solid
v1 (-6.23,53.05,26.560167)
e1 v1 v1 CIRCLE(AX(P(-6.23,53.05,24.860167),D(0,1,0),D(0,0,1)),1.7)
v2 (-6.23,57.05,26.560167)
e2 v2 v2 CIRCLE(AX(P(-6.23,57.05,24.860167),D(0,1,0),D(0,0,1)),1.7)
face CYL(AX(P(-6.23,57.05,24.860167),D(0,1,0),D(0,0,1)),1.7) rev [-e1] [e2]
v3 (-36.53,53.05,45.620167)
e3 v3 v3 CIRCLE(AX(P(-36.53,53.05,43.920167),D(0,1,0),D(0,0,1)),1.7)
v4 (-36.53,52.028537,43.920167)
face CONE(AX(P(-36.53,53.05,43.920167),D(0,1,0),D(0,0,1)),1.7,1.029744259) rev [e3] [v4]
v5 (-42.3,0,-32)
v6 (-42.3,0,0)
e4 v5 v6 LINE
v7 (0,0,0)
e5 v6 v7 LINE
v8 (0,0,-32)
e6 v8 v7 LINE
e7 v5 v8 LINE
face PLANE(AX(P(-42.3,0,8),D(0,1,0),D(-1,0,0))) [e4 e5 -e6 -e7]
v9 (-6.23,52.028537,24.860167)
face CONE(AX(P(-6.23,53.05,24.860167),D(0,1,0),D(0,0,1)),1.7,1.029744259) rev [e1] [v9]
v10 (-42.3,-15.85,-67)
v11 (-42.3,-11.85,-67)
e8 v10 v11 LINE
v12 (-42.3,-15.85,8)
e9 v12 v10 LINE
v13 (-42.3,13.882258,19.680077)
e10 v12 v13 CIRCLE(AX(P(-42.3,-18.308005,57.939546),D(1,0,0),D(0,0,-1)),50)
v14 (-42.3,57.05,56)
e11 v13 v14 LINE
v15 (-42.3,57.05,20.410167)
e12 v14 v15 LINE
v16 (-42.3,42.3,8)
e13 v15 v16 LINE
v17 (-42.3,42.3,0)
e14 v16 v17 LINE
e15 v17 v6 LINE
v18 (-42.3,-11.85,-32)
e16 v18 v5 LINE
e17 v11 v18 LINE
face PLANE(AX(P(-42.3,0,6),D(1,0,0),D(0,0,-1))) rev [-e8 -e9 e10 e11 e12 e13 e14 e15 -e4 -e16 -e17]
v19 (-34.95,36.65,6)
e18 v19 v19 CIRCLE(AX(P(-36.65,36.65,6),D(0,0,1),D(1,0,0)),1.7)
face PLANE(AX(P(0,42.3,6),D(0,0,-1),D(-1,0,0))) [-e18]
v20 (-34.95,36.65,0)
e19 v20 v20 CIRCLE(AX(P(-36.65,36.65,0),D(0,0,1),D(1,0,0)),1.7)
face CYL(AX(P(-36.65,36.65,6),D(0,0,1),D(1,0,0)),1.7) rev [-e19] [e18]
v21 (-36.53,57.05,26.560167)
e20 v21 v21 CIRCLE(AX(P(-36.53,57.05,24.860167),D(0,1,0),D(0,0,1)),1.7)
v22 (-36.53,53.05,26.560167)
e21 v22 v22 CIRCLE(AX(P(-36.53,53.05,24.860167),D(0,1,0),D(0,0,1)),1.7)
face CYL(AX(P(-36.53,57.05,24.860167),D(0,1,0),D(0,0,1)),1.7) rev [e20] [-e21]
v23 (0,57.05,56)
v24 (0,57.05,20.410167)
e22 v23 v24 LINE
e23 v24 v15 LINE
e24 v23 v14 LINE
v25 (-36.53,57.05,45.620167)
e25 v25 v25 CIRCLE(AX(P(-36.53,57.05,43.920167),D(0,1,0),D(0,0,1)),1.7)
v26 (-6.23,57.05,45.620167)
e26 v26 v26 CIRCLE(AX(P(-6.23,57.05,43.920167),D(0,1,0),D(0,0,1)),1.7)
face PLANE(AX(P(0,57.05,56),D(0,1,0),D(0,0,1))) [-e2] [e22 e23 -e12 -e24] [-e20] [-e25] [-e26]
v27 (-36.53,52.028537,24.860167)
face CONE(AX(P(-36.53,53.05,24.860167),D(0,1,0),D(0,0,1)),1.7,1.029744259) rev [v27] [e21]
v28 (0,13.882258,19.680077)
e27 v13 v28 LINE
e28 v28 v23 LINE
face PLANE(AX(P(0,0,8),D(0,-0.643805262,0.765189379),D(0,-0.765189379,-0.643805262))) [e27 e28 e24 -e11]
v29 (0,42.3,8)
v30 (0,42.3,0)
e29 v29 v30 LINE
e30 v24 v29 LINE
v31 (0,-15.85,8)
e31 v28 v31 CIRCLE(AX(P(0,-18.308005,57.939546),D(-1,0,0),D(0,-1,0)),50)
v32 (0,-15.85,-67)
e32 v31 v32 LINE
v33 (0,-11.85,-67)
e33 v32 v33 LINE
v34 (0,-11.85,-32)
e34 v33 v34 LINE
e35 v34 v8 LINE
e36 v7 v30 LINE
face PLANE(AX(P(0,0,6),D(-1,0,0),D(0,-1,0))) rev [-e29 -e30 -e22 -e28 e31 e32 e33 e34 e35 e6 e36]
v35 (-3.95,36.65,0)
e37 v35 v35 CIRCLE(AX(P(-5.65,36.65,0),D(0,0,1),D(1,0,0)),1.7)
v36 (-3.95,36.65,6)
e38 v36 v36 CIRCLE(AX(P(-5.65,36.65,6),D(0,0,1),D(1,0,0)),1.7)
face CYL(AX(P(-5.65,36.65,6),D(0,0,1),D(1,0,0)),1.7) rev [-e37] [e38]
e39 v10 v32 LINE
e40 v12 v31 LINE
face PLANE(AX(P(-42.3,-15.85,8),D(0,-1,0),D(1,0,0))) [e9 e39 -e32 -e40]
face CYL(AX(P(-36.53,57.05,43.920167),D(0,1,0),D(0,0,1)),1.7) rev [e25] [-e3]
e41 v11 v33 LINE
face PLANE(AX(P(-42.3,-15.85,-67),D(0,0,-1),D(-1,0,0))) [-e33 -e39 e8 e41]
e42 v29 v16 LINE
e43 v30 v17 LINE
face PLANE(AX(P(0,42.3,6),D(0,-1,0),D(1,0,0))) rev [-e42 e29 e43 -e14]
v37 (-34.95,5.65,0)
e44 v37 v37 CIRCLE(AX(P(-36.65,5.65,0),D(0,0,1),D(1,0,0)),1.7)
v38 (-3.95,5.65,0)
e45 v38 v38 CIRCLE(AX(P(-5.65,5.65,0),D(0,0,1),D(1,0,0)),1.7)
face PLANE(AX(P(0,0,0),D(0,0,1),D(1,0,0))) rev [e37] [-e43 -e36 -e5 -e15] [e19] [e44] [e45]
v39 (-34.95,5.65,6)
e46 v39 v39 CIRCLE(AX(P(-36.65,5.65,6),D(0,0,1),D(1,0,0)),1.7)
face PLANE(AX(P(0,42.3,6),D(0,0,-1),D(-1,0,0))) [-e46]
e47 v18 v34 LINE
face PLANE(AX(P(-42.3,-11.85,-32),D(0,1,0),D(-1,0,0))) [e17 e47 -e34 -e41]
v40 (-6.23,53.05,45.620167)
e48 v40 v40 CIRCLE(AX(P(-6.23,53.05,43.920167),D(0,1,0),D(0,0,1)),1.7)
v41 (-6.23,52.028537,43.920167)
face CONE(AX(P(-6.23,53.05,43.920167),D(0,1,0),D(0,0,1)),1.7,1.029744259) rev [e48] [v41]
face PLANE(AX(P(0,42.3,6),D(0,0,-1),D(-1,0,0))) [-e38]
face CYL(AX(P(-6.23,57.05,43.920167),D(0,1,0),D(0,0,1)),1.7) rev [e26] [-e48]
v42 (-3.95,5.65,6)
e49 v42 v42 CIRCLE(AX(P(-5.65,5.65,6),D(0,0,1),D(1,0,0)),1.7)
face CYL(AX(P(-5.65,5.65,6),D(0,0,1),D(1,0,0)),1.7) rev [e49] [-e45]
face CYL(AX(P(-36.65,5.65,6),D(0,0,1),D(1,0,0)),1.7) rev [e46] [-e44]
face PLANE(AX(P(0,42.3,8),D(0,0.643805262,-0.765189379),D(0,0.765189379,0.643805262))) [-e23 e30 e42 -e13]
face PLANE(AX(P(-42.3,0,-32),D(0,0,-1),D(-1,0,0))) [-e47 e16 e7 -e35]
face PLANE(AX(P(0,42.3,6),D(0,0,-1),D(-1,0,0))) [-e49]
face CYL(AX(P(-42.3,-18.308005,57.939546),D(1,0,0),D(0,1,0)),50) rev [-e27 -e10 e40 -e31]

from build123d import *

# Parameters (mm, degrees)
SCHIZZO1_W                   = 42.3
SCHIZZO1_H                   = 42.3
ESTRUSIONE_ESTRUSIONE1_DEPTH = 6
FORO_PER_VITE_M3_1_OUTLINE_R = 1.7
FORO_PER_VITE_M3_1_DEPTH     = 6
ESTRUSIONE_ESTRUSIONE2_DEPTH = 42.3
ESTRUSIONE_ESTRUSIONE4_DEPTH = 42.3
RACCORDO1_R                  = 50


# Read off the part's stored shape, not the designer's step: Foro per Vite M3-1, Foro per Vite M3-2
with BuildPart() as part:
    # Schizzo1 → Estrusione-Estrusione1 (new body)
    with BuildSketch(Plane.XY):
        with Locations((-21.15, 21.15)):
            Rectangle(SCHIZZO1_W, SCHIZZO1_H)
    extrude(amount=ESTRUSIONE_ESTRUSIONE1_DEPTH)

    # Foro per Vite M3-1 outline → Foro per Vite M3-1 (cut)
    with BuildSketch(Plane.XY):
        with Locations((-5.65, 36.65)):
            Circle(FORO_PER_VITE_M3_1_OUTLINE_R)
        with Locations((-36.65, 5.65)):
            Circle(FORO_PER_VITE_M3_1_OUTLINE_R)
        with Locations((-5.65, 5.65)):
            Circle(FORO_PER_VITE_M3_1_OUTLINE_R)
        with Locations((-36.65, 36.65)):
            Circle(FORO_PER_VITE_M3_1_OUTLINE_R)
    extrude(amount=FORO_PER_VITE_M3_1_DEPTH, mode=Mode.SUBTRACT)

    # Schizzo4 → Estrusione-Estrusione2 (add)
    with BuildSketch(Plane.ZY.offset(42.3)):
        Polygon((6, 0), (8, 0), (56, 57.05), (20.410166521, 57.05), (8, 42.3), (6, 42.3), align=None)
    extrude(amount=-ESTRUSIONE_ESTRUSIONE2_DEPTH)

    # Foro per Vite M3-2 outline → Foro per Vite M3-2 (revolve, cut)
    with BuildSketch(Plane(origin=(-6.23, 0, 24.860166521), x_dir=(1, 0, 0), z_dir=(0, 0, 1))):
        Polygon((0, 57.05), (0, 52.028536948), (1.7, 53.05), (1.7, 57.05), align=None)
    revolve(axis=Axis((-6.23, 0, 24.860166521), (0, 1, 0)), mode=Mode.SUBTRACT)

    # Foro per Vite M3-2 2 outline → Foro per Vite M3-2 2 (revolve, cut)
    with BuildSketch(Plane(origin=(-36.53, 0, 43.920166521), x_dir=(1, 0, 0), z_dir=(0, 0, 1))):
        Polygon((0, 57.05), (0, 52.028536948), (1.7, 53.05), (1.7, 57.05), align=None)
    revolve(axis=Axis((-36.53, 0, 43.920166521), (0, 1, 0)), mode=Mode.SUBTRACT)

    # Foro per Vite M3-2 3 outline → Foro per Vite M3-2 3 (revolve, cut)
    with BuildSketch(Plane(origin=(-6.23, 0, 43.920166521), x_dir=(1, 0, 0), z_dir=(0, 0, 1))):
        Polygon((0, 57.05), (0, 52.028536948), (1.7, 53.05), (1.7, 57.05), align=None)
    revolve(axis=Axis((-6.23, 0, 43.920166521), (0, 1, 0)), mode=Mode.SUBTRACT)

    # Foro per Vite M3-2 4 outline → Foro per Vite M3-2 4 (revolve, cut)
    with BuildSketch(Plane(origin=(-36.53, 0, 24.860166521), x_dir=(1, 0, 0), z_dir=(0, 0, 1))):
        Polygon((0, 57.05), (0, 52.028536948), (1.7, 53.05), (1.7, 57.05), align=None)
    revolve(axis=Axis((-36.53, 0, 24.860166521), (0, 1, 0)), mode=Mode.SUBTRACT)

    # Schizzo8 → Estrusione-Estrusione4 (add)
    with BuildSketch(Plane(origin=(0, 0, 0), x_dir=(0, 0, -1), z_dir=(1, 0, 0))):
        Polygon((-8, -15.85), (67, -15.85), (67, -11.85), (32, -11.85), (32, 0), (-8, 0), align=None)
    extrude(amount=-ESTRUSIONE_ESTRUSIONE4_DEPTH)

    # Raccordo1
    # the kernel refuses this fillet: 50 mm, written as the material it adds along each edge
    with BuildSketch(Plane(origin=(-42.3, 0, 8), x_dir=(0, 0.7651893786180985, 0.6438052615892854), z_dir=(1, 0, 0))) as raccordo1_piece_1:
        with BuildLine():
            CenterArc((18.14225095, 50), RACCORDO1_R, 232.741645316, 37.258354684)
            Line((-12.128251651, 10.204313396), (-12.733661703, 9.408399664))
            ThreePointArc((-12.733661703, 9.408399664), (-6.707931087, 4.336967319), (-0.643805262, -0.765189379))
            Line((-0.643805262, -0.765189379), (0, -1))
            Line((0, -1), (18.14225095, -1))
            Line((18.14225095, -1), (18.14225095, 0))
        make_face()
    extrude(amount=42.3)


solid = part.part
